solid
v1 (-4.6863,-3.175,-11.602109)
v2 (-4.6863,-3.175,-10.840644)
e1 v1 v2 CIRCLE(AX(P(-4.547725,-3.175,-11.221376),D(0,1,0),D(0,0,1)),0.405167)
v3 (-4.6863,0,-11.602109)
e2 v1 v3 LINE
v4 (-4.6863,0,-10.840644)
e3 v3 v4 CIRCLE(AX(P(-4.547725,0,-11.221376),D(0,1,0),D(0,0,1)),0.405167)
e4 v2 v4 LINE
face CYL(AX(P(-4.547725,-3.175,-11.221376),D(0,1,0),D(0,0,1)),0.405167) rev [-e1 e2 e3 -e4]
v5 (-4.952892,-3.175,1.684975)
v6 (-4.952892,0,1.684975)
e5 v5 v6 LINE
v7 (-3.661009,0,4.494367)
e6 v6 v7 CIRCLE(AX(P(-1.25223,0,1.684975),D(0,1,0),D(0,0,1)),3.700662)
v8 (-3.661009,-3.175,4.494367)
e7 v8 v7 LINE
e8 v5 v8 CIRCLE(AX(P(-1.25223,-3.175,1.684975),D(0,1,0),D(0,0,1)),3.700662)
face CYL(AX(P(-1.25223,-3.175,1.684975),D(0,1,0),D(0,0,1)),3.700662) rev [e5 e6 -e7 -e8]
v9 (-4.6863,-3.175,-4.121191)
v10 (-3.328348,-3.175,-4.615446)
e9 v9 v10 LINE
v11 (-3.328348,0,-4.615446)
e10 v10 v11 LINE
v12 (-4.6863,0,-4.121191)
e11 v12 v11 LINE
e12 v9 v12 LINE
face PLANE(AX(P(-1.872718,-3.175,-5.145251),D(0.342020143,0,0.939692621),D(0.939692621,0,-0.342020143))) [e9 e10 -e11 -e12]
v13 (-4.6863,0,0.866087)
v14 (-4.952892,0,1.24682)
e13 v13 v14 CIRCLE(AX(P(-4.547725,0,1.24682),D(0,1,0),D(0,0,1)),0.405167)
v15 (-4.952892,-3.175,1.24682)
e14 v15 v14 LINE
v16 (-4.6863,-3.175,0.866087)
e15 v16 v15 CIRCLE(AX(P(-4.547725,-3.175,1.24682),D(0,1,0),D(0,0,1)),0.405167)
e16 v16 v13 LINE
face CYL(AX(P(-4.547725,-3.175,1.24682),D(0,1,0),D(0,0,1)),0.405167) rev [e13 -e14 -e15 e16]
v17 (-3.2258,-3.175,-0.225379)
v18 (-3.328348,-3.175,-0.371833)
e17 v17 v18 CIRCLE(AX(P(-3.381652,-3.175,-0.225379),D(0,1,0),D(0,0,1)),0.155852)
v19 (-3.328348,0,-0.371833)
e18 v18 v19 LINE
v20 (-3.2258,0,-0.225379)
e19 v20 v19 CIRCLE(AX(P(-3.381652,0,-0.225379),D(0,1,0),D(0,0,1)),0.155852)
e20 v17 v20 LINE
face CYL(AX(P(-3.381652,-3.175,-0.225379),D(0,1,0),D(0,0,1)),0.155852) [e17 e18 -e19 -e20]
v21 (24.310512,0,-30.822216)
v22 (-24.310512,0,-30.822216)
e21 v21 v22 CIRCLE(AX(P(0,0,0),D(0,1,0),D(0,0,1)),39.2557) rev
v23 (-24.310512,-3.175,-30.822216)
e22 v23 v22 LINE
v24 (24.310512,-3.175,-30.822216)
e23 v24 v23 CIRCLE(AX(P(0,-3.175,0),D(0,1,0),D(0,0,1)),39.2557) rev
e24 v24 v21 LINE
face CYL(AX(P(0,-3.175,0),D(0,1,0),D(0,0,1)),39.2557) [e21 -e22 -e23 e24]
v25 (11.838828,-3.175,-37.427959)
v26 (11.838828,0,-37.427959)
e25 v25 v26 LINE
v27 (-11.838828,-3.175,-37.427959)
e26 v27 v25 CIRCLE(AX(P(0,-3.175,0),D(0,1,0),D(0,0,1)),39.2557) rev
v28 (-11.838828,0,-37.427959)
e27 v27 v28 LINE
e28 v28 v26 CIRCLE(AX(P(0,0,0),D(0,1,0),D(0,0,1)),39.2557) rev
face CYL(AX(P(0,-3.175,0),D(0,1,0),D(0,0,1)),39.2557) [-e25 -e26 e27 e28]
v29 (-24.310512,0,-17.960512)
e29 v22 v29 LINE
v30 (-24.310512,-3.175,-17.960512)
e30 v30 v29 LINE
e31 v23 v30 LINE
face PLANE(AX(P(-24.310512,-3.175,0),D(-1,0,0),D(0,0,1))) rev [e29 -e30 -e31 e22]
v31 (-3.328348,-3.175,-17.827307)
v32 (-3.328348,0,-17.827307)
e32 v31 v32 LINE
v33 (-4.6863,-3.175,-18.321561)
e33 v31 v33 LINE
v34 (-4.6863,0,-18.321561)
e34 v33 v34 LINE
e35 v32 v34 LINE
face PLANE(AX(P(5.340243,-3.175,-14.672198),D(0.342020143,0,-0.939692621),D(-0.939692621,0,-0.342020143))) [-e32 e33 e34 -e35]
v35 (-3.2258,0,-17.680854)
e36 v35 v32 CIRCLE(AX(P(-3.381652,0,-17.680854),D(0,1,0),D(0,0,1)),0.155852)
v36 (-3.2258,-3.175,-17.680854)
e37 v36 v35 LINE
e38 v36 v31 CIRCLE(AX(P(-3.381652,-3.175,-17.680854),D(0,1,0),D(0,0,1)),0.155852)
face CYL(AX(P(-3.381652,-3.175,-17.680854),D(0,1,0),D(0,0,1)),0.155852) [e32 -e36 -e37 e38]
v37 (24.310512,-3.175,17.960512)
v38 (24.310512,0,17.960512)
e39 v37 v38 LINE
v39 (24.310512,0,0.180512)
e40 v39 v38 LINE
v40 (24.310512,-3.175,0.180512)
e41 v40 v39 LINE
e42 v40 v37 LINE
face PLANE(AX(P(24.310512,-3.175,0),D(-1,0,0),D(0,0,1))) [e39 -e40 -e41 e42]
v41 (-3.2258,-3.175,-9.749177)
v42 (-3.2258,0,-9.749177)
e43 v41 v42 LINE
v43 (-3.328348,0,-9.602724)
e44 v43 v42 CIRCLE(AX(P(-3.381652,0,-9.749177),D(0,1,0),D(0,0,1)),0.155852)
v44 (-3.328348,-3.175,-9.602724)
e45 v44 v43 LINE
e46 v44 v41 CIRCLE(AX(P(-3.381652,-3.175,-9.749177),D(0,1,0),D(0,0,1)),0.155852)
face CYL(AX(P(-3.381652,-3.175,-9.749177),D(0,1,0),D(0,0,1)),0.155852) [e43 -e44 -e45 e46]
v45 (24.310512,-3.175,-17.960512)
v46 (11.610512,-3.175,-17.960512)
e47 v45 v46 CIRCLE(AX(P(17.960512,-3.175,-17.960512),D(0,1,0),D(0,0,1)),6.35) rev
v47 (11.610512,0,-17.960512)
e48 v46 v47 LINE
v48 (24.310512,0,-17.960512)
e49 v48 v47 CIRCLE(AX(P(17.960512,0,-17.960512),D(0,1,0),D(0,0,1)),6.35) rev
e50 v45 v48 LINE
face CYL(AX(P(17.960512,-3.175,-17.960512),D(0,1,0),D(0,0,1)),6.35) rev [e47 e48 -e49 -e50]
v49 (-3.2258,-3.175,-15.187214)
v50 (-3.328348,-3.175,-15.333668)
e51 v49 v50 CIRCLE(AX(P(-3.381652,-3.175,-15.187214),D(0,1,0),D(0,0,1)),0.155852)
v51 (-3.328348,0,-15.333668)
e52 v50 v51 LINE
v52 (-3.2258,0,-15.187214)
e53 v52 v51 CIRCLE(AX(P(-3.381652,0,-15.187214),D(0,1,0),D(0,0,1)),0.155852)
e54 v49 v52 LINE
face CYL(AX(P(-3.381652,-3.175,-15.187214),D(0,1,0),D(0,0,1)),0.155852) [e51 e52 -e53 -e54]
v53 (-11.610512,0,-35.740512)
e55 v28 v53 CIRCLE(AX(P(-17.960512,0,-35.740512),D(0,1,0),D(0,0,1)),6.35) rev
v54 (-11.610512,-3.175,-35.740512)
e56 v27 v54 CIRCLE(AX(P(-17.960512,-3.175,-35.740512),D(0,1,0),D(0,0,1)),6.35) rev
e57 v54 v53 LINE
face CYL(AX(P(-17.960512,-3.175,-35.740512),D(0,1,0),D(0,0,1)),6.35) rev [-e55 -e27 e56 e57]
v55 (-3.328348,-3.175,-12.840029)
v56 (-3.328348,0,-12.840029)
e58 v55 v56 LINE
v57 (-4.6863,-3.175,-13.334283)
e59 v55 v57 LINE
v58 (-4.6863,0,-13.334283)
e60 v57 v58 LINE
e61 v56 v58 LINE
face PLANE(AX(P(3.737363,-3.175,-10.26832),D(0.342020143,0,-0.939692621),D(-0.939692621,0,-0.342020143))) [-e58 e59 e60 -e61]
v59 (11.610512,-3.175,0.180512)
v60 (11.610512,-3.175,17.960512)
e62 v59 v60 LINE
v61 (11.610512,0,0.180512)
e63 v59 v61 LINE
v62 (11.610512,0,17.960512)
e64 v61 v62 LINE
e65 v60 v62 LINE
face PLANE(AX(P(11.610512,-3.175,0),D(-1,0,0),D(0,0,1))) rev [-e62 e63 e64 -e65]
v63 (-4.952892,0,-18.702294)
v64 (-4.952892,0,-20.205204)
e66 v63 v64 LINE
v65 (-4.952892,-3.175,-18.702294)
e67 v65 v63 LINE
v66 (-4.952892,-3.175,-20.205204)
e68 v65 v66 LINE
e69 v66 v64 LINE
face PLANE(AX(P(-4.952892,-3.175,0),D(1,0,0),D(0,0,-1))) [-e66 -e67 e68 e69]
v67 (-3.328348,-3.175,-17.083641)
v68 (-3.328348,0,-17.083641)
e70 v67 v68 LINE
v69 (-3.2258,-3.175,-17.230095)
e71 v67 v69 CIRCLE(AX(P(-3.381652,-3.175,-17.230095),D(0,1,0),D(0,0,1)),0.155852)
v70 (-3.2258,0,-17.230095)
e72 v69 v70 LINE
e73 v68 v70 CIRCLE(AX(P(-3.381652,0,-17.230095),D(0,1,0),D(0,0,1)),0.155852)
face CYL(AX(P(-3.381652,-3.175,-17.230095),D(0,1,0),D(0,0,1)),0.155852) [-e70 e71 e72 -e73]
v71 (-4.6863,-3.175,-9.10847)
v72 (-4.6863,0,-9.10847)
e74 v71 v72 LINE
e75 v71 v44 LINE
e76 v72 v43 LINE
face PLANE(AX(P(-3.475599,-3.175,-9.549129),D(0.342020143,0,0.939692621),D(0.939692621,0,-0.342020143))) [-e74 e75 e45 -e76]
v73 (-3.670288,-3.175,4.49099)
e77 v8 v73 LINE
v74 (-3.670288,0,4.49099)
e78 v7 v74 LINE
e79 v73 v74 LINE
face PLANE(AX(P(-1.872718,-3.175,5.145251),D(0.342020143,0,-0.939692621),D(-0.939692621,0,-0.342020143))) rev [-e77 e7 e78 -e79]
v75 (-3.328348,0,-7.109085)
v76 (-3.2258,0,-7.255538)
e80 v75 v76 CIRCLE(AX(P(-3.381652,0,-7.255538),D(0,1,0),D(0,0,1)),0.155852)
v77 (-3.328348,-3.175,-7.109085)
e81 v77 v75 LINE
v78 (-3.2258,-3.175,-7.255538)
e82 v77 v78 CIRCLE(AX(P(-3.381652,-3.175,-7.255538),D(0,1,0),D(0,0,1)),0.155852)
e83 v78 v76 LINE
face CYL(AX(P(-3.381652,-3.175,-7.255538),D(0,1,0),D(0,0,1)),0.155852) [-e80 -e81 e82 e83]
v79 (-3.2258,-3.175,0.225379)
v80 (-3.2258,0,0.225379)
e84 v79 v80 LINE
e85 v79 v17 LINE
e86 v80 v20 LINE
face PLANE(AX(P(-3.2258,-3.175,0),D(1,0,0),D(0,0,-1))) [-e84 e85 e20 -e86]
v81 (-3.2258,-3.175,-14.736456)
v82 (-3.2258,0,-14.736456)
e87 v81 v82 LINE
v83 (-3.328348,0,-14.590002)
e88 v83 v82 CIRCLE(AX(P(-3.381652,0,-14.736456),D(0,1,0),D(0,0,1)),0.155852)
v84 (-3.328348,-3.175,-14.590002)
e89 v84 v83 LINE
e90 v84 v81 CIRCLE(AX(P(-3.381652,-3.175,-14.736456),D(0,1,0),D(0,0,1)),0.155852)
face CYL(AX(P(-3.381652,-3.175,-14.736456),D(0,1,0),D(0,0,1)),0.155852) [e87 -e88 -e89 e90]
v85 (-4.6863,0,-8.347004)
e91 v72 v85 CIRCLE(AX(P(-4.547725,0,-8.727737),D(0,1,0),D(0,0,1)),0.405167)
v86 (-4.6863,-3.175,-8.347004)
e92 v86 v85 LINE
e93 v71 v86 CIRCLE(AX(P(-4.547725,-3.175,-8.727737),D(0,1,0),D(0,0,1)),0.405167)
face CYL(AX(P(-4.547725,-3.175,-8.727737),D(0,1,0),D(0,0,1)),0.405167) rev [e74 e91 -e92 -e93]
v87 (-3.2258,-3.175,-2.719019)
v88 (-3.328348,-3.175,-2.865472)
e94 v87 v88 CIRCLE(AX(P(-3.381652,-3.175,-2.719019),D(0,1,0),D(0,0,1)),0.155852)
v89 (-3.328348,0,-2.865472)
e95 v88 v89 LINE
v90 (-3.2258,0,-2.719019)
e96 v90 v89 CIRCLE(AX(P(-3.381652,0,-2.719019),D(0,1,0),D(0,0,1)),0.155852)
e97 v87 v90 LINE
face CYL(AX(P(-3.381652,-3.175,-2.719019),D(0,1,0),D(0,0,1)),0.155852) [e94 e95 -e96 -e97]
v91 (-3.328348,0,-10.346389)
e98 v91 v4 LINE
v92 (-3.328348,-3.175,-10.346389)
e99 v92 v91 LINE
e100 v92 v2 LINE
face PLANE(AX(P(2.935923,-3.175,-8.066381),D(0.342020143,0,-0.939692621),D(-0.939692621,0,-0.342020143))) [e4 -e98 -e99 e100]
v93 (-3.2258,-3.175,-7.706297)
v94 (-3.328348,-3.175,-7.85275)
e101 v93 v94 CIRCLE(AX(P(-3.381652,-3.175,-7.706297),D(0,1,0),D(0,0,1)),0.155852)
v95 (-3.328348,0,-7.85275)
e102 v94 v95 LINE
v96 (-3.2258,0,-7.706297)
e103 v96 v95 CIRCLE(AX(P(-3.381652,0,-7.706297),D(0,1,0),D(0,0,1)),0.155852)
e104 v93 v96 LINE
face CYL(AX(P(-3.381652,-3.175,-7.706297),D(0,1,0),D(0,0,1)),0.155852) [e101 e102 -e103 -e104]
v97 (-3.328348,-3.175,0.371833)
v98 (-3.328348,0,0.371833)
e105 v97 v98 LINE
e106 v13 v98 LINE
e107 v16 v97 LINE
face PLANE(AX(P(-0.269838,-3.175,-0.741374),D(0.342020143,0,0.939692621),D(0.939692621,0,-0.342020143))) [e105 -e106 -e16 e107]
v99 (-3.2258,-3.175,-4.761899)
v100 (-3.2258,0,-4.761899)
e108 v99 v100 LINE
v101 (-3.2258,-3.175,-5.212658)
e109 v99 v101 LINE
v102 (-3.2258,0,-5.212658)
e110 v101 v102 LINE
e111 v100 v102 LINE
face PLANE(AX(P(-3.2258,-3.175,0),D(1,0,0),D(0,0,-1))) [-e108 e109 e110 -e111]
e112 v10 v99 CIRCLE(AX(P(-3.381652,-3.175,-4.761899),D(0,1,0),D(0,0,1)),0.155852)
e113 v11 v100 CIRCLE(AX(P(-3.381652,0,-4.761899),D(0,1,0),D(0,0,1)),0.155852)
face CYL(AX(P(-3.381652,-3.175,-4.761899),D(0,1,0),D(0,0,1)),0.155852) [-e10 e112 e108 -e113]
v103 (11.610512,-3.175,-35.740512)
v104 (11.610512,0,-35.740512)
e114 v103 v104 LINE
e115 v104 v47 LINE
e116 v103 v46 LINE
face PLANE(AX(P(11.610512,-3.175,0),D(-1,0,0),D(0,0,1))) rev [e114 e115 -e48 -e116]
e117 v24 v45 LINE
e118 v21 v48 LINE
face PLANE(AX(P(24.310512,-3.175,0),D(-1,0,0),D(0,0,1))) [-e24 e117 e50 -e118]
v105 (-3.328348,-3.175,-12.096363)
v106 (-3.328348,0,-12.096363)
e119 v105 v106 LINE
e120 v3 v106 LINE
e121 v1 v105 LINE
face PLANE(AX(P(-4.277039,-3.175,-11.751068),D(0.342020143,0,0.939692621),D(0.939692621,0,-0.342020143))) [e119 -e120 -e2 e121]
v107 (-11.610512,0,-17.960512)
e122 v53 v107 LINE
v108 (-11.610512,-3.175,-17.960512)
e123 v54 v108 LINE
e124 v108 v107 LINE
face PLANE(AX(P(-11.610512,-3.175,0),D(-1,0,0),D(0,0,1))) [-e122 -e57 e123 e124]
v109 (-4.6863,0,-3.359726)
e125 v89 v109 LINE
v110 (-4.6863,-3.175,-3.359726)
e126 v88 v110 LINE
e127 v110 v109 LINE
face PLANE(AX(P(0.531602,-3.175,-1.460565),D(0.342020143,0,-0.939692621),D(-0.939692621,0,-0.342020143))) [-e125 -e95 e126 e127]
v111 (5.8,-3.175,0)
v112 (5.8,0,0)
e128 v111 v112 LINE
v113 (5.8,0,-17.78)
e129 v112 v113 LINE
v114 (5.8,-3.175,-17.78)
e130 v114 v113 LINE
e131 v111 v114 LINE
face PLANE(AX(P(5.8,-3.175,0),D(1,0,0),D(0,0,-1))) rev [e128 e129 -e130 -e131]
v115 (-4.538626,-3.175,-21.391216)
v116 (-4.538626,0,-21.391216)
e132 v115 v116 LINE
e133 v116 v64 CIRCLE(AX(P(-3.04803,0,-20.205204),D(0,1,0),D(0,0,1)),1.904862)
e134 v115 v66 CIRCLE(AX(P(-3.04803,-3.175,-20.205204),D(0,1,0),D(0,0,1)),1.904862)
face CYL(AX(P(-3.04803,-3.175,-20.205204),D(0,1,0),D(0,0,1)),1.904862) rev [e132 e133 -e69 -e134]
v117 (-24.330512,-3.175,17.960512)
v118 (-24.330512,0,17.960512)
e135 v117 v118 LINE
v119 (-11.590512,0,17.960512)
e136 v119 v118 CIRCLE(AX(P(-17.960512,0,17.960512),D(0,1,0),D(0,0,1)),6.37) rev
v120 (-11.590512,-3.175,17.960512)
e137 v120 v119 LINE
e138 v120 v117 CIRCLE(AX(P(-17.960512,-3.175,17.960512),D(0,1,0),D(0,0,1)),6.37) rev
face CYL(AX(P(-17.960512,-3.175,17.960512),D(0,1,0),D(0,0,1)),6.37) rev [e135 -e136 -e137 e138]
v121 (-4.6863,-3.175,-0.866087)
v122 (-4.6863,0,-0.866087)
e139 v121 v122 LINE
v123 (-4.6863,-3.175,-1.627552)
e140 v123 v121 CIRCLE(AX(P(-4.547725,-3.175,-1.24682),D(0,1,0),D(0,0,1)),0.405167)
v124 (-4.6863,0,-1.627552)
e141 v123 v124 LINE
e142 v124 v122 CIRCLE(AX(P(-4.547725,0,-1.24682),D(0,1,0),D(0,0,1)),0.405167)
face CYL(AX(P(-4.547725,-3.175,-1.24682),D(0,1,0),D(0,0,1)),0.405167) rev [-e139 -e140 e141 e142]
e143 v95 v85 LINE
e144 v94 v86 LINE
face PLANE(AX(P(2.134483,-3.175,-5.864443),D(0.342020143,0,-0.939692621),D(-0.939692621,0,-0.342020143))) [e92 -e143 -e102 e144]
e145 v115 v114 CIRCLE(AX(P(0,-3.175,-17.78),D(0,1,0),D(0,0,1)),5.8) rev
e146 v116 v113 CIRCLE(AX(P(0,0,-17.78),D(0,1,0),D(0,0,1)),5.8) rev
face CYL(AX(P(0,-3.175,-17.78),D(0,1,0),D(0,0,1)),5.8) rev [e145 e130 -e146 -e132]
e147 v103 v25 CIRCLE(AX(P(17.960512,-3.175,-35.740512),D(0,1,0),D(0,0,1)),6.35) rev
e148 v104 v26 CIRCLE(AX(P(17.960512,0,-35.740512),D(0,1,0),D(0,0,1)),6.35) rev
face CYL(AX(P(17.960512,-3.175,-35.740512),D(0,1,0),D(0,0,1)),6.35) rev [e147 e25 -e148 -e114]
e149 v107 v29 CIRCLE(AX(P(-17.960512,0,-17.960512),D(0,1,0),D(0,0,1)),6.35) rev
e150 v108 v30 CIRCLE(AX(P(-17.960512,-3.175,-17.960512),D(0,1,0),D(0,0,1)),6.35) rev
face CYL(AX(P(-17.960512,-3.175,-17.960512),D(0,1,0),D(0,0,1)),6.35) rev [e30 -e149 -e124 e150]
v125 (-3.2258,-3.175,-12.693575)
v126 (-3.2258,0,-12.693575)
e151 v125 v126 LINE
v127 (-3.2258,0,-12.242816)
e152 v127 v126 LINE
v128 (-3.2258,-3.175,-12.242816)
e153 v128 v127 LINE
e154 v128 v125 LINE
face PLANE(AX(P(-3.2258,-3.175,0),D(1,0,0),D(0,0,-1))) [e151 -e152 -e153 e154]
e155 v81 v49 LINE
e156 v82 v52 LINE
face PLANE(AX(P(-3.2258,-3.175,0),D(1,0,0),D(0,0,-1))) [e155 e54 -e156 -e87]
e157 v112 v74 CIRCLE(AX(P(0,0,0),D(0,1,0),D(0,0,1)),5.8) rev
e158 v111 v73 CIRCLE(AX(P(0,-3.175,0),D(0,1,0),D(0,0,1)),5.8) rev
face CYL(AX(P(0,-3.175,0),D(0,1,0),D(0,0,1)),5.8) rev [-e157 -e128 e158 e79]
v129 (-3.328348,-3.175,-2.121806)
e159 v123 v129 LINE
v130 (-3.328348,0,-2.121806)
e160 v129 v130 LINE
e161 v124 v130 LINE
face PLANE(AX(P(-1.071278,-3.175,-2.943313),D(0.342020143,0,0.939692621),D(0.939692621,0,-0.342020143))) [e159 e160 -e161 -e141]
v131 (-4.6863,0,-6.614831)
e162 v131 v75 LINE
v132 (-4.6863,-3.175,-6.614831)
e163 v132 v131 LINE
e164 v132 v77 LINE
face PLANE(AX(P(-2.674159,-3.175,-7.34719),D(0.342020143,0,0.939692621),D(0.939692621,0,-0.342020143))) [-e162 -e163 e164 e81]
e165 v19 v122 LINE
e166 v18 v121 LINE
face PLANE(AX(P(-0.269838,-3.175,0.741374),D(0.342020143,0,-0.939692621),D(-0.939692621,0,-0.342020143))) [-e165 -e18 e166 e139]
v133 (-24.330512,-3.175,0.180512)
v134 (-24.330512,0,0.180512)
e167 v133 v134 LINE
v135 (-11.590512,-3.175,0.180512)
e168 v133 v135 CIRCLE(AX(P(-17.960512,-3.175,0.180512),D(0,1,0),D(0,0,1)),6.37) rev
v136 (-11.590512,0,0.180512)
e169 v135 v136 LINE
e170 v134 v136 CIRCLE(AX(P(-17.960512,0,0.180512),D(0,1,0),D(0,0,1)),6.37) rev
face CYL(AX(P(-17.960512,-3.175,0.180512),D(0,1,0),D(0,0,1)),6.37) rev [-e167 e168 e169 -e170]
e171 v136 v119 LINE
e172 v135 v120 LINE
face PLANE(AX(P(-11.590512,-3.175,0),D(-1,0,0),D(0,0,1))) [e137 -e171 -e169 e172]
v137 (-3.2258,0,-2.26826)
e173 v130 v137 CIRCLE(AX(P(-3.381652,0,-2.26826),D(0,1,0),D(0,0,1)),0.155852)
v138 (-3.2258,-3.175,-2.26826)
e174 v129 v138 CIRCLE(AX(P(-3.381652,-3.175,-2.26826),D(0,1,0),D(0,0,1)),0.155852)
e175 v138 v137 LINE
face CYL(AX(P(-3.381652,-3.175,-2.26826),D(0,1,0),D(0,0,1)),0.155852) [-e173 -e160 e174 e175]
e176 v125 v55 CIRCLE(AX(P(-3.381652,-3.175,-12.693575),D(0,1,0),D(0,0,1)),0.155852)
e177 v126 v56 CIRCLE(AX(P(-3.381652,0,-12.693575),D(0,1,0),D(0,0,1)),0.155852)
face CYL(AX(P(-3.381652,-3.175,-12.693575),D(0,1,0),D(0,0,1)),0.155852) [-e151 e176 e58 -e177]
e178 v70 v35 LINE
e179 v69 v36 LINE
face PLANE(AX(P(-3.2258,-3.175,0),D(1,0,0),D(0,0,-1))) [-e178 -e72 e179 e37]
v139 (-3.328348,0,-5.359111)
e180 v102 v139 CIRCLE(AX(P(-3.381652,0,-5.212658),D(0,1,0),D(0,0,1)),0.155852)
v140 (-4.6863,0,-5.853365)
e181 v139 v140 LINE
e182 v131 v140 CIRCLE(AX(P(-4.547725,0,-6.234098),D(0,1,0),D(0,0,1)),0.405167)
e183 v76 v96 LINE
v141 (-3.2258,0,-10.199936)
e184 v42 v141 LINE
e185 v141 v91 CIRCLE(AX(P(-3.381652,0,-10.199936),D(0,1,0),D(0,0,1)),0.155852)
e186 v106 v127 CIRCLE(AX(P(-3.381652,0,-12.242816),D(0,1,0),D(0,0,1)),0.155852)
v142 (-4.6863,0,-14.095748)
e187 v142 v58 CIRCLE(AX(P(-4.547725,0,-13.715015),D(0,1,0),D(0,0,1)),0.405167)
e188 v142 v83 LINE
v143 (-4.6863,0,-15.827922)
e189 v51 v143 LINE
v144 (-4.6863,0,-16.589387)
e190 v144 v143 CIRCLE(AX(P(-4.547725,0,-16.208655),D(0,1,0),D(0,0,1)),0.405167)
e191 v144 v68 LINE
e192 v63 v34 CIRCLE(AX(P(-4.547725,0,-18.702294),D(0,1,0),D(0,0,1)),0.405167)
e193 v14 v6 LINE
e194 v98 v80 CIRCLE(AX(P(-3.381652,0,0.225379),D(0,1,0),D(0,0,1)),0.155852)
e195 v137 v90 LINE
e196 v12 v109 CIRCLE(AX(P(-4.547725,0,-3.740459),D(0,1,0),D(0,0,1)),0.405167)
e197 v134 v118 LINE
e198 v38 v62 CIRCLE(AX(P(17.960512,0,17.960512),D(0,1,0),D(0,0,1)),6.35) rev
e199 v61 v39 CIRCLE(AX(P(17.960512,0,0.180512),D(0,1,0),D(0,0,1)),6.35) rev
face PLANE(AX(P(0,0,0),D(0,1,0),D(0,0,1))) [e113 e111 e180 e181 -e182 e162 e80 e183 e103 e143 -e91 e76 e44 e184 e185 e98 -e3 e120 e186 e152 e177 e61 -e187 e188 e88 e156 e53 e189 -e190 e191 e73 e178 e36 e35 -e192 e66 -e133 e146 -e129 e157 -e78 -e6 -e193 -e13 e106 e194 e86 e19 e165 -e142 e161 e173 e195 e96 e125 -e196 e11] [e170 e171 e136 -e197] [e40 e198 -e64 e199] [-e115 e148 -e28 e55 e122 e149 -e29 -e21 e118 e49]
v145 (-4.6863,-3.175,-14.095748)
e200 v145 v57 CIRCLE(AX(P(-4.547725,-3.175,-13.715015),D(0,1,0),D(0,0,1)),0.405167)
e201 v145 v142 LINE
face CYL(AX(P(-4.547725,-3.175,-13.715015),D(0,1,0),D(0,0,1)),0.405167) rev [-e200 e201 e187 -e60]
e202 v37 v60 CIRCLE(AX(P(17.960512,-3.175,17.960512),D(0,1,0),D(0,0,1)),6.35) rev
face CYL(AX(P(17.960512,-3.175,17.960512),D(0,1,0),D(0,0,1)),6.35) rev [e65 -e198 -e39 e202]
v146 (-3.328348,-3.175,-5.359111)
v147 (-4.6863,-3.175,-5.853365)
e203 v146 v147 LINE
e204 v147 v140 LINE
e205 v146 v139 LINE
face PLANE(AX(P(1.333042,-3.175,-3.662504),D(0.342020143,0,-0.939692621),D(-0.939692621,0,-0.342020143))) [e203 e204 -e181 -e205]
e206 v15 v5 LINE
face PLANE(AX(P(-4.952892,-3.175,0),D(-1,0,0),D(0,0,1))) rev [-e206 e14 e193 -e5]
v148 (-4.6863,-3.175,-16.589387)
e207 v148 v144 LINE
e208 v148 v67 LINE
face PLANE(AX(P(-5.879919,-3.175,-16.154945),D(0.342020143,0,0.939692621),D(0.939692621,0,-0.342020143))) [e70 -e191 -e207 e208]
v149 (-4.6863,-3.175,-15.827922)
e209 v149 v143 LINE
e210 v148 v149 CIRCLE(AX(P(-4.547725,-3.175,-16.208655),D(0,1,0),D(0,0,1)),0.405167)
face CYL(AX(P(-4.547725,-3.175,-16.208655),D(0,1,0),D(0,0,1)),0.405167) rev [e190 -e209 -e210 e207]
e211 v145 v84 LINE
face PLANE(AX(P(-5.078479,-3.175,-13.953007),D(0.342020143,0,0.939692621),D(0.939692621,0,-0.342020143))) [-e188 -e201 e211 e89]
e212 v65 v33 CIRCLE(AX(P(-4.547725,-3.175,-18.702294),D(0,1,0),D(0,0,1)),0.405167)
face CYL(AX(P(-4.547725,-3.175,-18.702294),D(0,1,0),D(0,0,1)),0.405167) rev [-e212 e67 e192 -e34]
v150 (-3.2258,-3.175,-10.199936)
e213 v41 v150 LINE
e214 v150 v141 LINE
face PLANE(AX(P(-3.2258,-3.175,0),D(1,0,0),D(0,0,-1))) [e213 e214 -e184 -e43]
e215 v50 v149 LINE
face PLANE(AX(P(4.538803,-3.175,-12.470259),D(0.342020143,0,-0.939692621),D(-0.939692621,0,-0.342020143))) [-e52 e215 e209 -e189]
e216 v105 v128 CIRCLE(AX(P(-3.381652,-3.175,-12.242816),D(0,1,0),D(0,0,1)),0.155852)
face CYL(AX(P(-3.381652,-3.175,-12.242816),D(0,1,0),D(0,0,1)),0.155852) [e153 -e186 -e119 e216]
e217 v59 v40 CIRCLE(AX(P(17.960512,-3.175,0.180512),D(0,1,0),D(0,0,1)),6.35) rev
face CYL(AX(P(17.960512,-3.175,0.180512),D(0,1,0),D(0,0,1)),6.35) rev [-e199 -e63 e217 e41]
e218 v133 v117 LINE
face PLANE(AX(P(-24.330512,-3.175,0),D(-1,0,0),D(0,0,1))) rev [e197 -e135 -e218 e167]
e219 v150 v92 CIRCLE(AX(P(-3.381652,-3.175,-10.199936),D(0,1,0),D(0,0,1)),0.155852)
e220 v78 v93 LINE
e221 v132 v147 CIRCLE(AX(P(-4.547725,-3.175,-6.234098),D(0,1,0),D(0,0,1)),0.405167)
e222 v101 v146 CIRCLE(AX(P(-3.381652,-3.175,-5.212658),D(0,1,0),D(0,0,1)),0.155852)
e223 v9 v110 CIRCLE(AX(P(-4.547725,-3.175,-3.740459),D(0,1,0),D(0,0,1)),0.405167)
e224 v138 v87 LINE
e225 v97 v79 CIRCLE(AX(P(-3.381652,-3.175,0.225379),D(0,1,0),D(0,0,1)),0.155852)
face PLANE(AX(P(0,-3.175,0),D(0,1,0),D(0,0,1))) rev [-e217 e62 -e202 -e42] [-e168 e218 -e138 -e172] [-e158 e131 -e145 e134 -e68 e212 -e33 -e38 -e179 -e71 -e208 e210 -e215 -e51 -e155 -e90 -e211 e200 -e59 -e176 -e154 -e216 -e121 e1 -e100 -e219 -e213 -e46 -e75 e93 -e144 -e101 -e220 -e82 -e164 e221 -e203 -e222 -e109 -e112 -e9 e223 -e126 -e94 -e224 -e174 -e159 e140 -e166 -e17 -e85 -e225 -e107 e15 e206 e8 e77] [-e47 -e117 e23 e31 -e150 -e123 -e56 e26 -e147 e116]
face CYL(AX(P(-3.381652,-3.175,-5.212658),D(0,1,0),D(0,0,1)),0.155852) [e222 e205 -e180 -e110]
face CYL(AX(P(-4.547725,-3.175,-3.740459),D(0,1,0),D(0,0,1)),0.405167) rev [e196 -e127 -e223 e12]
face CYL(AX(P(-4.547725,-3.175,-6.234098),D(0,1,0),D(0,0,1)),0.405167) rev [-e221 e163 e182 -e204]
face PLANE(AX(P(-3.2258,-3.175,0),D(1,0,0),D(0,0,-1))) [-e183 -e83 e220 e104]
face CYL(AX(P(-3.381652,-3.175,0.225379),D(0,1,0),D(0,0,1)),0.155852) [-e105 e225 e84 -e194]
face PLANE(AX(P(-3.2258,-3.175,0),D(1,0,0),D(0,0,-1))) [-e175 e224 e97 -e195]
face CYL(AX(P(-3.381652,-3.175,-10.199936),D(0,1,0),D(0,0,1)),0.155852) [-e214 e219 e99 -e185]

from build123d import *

# Parameters (mm, degrees)
BOSS_EXTRUDE1_DEPTH = 3.175
BOSS_EXTRUDE3_START = -3.175
BOSS_EXTRUDE3_DEPTH = 3.175


# Read off the part's stored shape, not the designer's step: Boss-Extrude3
with BuildPart() as part:
    # Sketch3 → Boss-Extrude1 (new body)
    with BuildSketch(Plane.XZ):
        with BuildLine():
            ThreePointArc((39.2557, 0), (-17.127226966, 35.322345321), (-24.310512242, -30.822215641))
            Line((-24.310512242, -30.822215641), (-24.310512242, -17.960512242))
            ThreePointArc((-24.310512242, -17.960512242), (-17.960512242, -11.610512242), (-11.610512242, -17.960512242))
            Line((-11.610512242, -17.960512242), (-11.610512242, -35.740512242))
            ThreePointArc((-11.610512242, -35.740512242), (-11.667849962, -36.591923676), (-11.838827653, -37.427959366))
            ThreePointArc((-11.838827653, -37.427959366), (0, -39.2557), (11.838827653, -37.427959366))
            ThreePointArc((11.838827653, -37.427959366), (11.667849962, -36.591923676), (11.610512242, -35.740512242))
            Line((11.610512242, -35.740512242), (11.610512242, -17.960512242))
            ThreePointArc((11.610512242, -17.960512242), (17.960512242, -11.610512242), (24.310512242, -17.960512242))
            Line((24.310512242, -17.960512242), (24.310512242, -30.822215641))
            ThreePointArc((24.310512242, -30.822215641), (35.322345321, -17.127226966), (39.2557, 0))
        make_face()
        with BuildLine():
            ThreePointArc((-5.8, 0), (0, 5.8), (5.8, 0))
            Line((5.8, 0), (5.8, -17.78))
            ThreePointArc((5.8, -17.78), (0, -23.58), (-5.8, -17.78))
            Line((-5.8, -17.78), (-5.8, 0))
        make_face(mode=Mode.SUBTRACT)
        with BuildLine():
            ThreePointArc((-11.590512242, 0.180512242), (-17.960512242, -6.189487758), (-24.330512242, 0.180512242))
            Line((-24.330512242, 0.180512242), (-24.330512242, 17.960512242))
            ThreePointArc((-24.330512242, 17.960512242), (-17.960512242, 24.330512242), (-11.590512242, 17.960512242))
            Line((-11.590512242, 17.960512242), (-11.590512242, 0.180512242))
        make_face(mode=Mode.SUBTRACT)
        with BuildLine():
            ThreePointArc((24.310512242, 0.180512242), (17.960512242, -6.169487758), (11.610512242, 0.180512242))
            Line((11.610512242, 0.180512242), (11.610512242, 17.960512242))
            ThreePointArc((11.610512242, 17.960512242), (17.960512242, 24.310512242), (24.310512242, 17.960512242))
            Line((24.310512242, 17.960512242), (24.310512242, 0.180512242))
        make_face(mode=Mode.SUBTRACT)
    extrude(amount=BOSS_EXTRUDE1_DEPTH)

    # Boss-Extrude3 outline → Boss-Extrude3 (add)
    with BuildSketch(Plane(origin=(0, 0, 0), x_dir=(1, 0, 0), z_dir=(0, 1, 0)).offset(BOSS_EXTRUDE3_START)):
        with BuildLine():
            Line((-4.952891864, -1.684975141), (-4.952891864, -1.246819584))
            ThreePointArc((-4.952891864, -1.246819584), (-4.879618202, -1.014425219), (-4.6863, -0.866086946))
            Line((-4.6863, -0.866086946), (-3.328347771, -0.371832755))
            ThreePointArc((-3.328347771, -0.371832755), (-3.253985597, -0.314772651), (-3.2258, -0.22537936))
            Line((-3.2258, -0.22537936), (-3.2258, 0.22537936))
            ThreePointArc((-3.2258, 0.22537936), (-3.253985597, 0.314772651), (-3.328347771, 0.371832755))
            Line((-3.328347771, 0.371832755), (-4.6863, 0.866086946))
            ThreePointArc((-4.6863, 0.866086946), (-4.952891864, 1.246819585), (-4.6863, 1.627552223))
            Line((-4.6863, 1.627552223), (-3.328347771, 2.121806414))
            ThreePointArc((-3.328347771, 2.121806414), (-3.253985597, 2.178866518), (-3.2258, 2.268259809))
            Line((-3.2258, 2.268259809), (-3.2258, 2.719018529))
            ThreePointArc((-3.2258, 2.719018529), (-3.253985597, 2.80841182), (-3.328347771, 2.865471924))
            Line((-3.328347771, 2.865471924), (-4.6863, 3.359726115))
            ThreePointArc((-4.6863, 3.359726115), (-4.952891864, 3.740458754), (-4.6863, 4.121191392))
            Line((-4.6863, 4.121191392), (-3.328347771, 4.615445582))
            ThreePointArc((-3.328347771, 4.615445582), (-3.253985597, 4.672505686), (-3.2258, 4.761898978))
            Line((-3.2258, 4.761898978), (-3.2258, 5.212657697))
            ThreePointArc((-3.2258, 5.212657697), (-3.253985597, 5.302050989), (-3.328347771, 5.359111093))
            Line((-3.328347771, 5.359111093), (-4.6863, 5.853365283))
            ThreePointArc((-4.6863, 5.853365283), (-4.952891864, 6.234097921), (-4.6863, 6.61483056))
            Line((-4.6863, 6.61483056), (-3.328347771, 7.109084751))
            ThreePointArc((-3.328347771, 7.109084751), (-3.253985597, 7.166144855), (-3.2258, 7.255538147))
            Line((-3.2258, 7.255538147), (-3.2258, 7.706296866))
            ThreePointArc((-3.2258, 7.706296866), (-3.253985597, 7.795690157), (-3.328347771, 7.852750261))
            Line((-3.328347771, 7.852750261), (-4.6863, 8.347004452))
            ThreePointArc((-4.6863, 8.347004452), (-4.952891864, 8.72773709), (-4.6863, 9.108469729))
            Line((-4.6863, 9.108469729), (-3.328347771, 9.60272392))
            ThreePointArc((-3.328347771, 9.60272392), (-3.253985597, 9.659784024), (-3.2258, 9.749177315))
            Line((-3.2258, 9.749177315), (-3.2258, 10.199936035))
            ThreePointArc((-3.2258, 10.199936035), (-3.253985597, 10.289329326), (-3.328347771, 10.34638943))
            Line((-3.328347771, 10.34638943), (-4.6863, 10.840643621))
            ThreePointArc((-4.6863, 10.840643621), (-4.952891864, 11.221376259), (-4.6863, 11.602108898))
            Line((-4.6863, 11.602108898), (-3.328347771, 12.096363089))
            ThreePointArc((-3.328347771, 12.096363089), (-3.253985597, 12.153423193), (-3.2258, 12.242816484))
            Line((-3.2258, 12.242816484), (-3.2258, 12.693575204))
            ThreePointArc((-3.2258, 12.693575204), (-3.253985597, 12.782968495), (-3.328347771, 12.840028599))
            Line((-3.328347771, 12.840028599), (-4.6863, 13.33428279))
            ThreePointArc((-4.6863, 13.33428279), (-4.952891864, 13.715015428), (-4.6863, 14.095748067))
            Line((-4.6863, 14.095748067), (-3.328347771, 14.590002258))
            ThreePointArc((-3.328347771, 14.590002258), (-3.253985597, 14.647062362), (-3.2258, 14.736455653))
            Line((-3.2258, 14.736455653), (-3.2258, 15.187214372))
            ThreePointArc((-3.2258, 15.187214372), (-3.253985597, 15.276607664), (-3.328347771, 15.333667768))
            Line((-3.328347771, 15.333667768), (-4.6863, 15.827921959))
            ThreePointArc((-4.6863, 15.827921959), (-4.952891864, 16.208654598), (-4.6863, 16.589387236))
            Line((-4.6863, 16.589387236), (-3.328347771, 17.083641426))
            ThreePointArc((-3.328347771, 17.083641426), (-3.253985597, 17.14070153), (-3.2258, 17.230094822))
            Line((-3.2258, 17.230094822), (-3.2258, 17.680853541))
            ThreePointArc((-3.2258, 17.680853541), (-3.253985597, 17.770246833), (-3.328347771, 17.827306937))
            Line((-3.328347771, 17.827306937), (-4.6863, 18.321561127))
            ThreePointArc((-4.6863, 18.321561127), (-4.879618202, 18.469899401), (-4.952891864, 18.702293766))
            Line((-4.952891864, 18.702293766), (-4.952891864, 20.205203806))
            ThreePointArc((-4.952891864, 20.205203806), (-4.846345509, 20.833344029), (-4.538625549, 21.391215602))
            ThreePointArc((-4.538625549, 21.391215602), (-5.475583448, 19.692586183), (-5.8, 17.78))
            Line((-5.8, 17.78), (-5.8, 0))
            ThreePointArc((-5.8, 0), (-5.240594871, -2.485189209), (-3.670287792, -4.490989593))
            Line((-3.670287792, -4.490989593), (-3.66100885, -4.494366852))
            ThreePointArc((-3.66100885, -4.494366852), (-4.614444615, -3.231070506), (-4.952891864, -1.684975141))
        make_face()
    extrude(amount=BOSS_EXTRUDE3_DEPTH)


solid = part.part
